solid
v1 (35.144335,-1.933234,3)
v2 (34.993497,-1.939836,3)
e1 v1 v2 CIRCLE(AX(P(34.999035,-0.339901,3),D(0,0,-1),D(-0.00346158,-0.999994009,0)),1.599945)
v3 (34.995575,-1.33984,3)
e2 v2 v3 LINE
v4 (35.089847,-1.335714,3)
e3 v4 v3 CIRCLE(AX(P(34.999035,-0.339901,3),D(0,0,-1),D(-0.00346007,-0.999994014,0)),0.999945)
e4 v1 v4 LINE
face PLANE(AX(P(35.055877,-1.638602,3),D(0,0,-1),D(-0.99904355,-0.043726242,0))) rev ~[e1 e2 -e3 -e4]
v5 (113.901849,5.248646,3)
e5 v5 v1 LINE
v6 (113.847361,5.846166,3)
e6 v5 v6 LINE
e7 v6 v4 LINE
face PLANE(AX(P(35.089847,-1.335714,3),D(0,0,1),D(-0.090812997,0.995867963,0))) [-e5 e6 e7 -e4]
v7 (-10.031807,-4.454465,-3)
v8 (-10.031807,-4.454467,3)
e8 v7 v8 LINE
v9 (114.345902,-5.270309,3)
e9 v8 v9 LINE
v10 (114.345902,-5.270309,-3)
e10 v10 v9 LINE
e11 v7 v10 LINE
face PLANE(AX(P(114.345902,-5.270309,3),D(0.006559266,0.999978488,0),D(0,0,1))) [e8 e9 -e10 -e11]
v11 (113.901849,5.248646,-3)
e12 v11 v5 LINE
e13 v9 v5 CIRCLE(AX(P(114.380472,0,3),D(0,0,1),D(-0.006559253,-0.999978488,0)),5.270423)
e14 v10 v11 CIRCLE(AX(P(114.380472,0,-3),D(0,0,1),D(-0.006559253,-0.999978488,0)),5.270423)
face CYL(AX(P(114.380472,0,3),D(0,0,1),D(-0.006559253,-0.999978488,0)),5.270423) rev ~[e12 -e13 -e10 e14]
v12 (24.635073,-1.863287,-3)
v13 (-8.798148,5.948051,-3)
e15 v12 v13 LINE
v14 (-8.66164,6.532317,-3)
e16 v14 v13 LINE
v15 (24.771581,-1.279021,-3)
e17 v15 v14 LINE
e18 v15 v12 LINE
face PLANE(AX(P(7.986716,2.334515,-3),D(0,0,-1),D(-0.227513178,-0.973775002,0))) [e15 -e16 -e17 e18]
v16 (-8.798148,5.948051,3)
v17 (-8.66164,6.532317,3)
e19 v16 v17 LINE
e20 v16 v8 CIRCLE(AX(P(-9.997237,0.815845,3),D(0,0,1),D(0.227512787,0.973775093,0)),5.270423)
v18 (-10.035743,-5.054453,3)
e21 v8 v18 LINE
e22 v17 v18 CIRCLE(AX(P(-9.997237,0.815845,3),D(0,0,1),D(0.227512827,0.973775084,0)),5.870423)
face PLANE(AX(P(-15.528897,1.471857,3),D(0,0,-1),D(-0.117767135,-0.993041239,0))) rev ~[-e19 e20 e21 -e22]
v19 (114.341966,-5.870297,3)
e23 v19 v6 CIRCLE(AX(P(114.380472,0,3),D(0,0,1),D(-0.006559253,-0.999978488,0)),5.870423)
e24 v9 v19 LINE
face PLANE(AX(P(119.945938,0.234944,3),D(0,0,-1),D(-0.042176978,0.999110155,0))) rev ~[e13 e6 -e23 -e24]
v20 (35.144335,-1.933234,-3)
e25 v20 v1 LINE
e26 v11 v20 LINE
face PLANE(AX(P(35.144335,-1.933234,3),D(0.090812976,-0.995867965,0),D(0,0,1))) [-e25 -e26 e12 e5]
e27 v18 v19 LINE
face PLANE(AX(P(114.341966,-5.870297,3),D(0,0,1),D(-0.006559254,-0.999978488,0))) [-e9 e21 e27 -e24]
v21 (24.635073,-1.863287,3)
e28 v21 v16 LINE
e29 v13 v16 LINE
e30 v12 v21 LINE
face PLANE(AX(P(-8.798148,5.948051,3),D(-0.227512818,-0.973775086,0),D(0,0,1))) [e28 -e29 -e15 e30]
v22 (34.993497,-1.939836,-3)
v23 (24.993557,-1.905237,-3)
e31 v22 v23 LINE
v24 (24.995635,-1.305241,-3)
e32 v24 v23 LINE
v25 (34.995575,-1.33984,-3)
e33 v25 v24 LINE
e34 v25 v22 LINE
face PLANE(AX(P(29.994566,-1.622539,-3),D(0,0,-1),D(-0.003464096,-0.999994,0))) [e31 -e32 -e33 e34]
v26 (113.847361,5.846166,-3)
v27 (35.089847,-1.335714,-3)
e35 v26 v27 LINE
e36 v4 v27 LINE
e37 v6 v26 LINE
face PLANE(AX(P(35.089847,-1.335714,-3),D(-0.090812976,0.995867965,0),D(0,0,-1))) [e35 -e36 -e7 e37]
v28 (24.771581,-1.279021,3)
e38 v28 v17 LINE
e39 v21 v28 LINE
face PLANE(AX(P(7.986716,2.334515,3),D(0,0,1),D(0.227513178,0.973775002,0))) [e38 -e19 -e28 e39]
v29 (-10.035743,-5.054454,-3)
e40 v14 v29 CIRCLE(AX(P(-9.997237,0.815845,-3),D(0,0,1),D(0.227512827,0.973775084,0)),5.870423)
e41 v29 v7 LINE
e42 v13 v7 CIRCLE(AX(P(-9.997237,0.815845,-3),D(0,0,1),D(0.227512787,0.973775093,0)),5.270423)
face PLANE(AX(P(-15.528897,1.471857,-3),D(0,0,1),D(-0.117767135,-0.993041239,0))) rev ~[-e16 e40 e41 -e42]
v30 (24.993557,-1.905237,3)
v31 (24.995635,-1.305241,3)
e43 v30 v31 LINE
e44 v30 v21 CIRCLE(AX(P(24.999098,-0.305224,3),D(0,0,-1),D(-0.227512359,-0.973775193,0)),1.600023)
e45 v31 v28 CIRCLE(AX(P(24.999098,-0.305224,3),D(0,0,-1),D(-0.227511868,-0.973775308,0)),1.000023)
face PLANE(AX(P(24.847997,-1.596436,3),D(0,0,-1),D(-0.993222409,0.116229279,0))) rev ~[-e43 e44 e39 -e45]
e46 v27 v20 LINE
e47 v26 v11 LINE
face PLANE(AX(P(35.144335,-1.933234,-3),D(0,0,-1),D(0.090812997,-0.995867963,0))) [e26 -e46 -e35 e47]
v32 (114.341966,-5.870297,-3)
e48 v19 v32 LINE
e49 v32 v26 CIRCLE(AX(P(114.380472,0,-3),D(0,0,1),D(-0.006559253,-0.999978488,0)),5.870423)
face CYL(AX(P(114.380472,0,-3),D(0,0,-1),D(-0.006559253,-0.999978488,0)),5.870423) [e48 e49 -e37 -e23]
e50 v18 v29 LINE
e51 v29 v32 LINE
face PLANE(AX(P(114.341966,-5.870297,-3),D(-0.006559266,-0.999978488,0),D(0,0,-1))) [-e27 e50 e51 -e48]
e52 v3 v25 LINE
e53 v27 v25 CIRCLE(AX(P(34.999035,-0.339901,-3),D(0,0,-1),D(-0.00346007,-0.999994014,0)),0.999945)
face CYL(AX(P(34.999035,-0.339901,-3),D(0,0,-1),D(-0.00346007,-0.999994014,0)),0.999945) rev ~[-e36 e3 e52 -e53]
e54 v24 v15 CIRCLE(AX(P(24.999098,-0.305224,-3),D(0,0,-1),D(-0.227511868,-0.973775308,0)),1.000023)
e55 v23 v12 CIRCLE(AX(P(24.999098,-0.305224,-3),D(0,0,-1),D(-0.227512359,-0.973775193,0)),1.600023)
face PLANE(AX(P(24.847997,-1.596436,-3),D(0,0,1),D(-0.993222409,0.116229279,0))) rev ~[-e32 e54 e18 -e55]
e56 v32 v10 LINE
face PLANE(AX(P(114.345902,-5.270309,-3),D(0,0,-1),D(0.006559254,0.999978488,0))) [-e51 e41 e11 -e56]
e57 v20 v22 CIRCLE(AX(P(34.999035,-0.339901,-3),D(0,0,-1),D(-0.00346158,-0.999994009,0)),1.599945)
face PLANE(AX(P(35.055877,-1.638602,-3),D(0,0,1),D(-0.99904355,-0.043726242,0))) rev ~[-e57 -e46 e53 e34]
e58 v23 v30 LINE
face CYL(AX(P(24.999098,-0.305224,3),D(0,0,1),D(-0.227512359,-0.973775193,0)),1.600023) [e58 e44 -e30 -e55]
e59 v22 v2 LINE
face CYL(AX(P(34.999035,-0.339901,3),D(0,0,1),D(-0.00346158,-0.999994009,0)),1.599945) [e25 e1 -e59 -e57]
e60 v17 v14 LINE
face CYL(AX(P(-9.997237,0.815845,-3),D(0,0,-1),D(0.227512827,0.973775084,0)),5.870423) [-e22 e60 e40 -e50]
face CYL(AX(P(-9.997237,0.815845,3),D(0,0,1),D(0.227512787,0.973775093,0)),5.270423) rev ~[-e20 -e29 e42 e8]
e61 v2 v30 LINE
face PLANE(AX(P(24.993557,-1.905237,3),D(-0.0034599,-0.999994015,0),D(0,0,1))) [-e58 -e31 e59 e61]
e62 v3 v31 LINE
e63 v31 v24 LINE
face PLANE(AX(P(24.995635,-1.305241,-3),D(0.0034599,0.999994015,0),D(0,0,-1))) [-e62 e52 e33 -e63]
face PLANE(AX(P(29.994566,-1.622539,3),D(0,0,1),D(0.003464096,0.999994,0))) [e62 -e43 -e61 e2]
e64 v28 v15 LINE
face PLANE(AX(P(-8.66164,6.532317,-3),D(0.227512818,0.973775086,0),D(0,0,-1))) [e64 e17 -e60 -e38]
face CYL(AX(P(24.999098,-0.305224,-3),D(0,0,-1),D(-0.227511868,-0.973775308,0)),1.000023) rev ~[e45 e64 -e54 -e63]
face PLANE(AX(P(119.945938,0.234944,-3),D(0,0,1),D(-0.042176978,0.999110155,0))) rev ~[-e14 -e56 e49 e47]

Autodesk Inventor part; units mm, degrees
sketch "Skizzenpfad" plane through (0, 0, 0) normal (0, 0, 1) x (1, 0, 0)
  arc A0 (114.343934, -5.570303) -> (113.874605, 5.547406) centre (114.380472, 0) ccw
  arc A1 (-8.729894, 6.240184) -> (-10.033775, -4.754459) centre (-9.997237, 0.815845) ccw
  arc A2 (24.703327, -1.571154) -> (24.994596, -1.605239) centre (24.999094, -0.305247) ccw
  arc A3 (34.994536, -1.639838) -> (35.117091, -1.634474) centre (34.999034, -0.339846) ccw
  line L0 (35.117091, -1.634474) -> (113.874605, 5.547406)
  line L1 (114.343934, -5.570303) -> (-10.033775, -4.754459)
  line L2 (-8.729894, 6.240184) -> (24.703327, -1.571154)
  line L3 (24.994596, -1.605239) -> (34.994536, -1.639838)
ref_plane "Querschnittsebene" through (113.874605, 5.547406, 0) normal (-0.995868, -0.090813, 0) x (0, 0, 1)
ref_plane "Arbeitsebene2" through (114.380472, 0, 0) normal (-1, 0, 0) x (0, 0, 1)
ref_plane "Arbeitsebene3" through (-9.997237, 0.815845, 0) normal (0.99382, -0.1110038, 0) x (0, 0, 1)
sketch "Querschnitt" plane through (113.874605, 5.547406, 0) normal (-0.995868, -0.090813, 0) x (0, 0, 1)
  line L0 (-3, 0.3) -> (3, 0.3)
  line L1 (3, 0.3) -> (3, -0.3)
  line L2 (3, -0.3) -> (-3, -0.3)
  line L3 (-3, -0.3) -> (-3, 0.3)
  line L4 (-3, 0) -> (3, 0) construction
  point P0 (0, 0)
  point P1 (0, 0)
  dimension "d0" = 6
  dimension "d4" = 0.3
  dimension "d5" = 0.3
sweep "Riemen" add profiles "Querschnitt" path "Skizzenpfad"
equation "\"d0\" = da_B"
equation "\"d4\" = da_a"
equation "\"d5\" = da_a2"
equation "\"da_B\" = 6"
equation "\"da_pb\" = 2.5"
equation "\"da_L\" = 285"
equation "\"da_a\" = 0.3"
equation "\"da_S\" = 1.5"
equation "\"da_Beta\" = 20deg"
equation "\"da_Ht\" = 0.7"
equation "\"da_H\" = 1.3"
equation "\"da_a2\" = 0.3"
properties part number "Zahnriemen" material "Rubber"
